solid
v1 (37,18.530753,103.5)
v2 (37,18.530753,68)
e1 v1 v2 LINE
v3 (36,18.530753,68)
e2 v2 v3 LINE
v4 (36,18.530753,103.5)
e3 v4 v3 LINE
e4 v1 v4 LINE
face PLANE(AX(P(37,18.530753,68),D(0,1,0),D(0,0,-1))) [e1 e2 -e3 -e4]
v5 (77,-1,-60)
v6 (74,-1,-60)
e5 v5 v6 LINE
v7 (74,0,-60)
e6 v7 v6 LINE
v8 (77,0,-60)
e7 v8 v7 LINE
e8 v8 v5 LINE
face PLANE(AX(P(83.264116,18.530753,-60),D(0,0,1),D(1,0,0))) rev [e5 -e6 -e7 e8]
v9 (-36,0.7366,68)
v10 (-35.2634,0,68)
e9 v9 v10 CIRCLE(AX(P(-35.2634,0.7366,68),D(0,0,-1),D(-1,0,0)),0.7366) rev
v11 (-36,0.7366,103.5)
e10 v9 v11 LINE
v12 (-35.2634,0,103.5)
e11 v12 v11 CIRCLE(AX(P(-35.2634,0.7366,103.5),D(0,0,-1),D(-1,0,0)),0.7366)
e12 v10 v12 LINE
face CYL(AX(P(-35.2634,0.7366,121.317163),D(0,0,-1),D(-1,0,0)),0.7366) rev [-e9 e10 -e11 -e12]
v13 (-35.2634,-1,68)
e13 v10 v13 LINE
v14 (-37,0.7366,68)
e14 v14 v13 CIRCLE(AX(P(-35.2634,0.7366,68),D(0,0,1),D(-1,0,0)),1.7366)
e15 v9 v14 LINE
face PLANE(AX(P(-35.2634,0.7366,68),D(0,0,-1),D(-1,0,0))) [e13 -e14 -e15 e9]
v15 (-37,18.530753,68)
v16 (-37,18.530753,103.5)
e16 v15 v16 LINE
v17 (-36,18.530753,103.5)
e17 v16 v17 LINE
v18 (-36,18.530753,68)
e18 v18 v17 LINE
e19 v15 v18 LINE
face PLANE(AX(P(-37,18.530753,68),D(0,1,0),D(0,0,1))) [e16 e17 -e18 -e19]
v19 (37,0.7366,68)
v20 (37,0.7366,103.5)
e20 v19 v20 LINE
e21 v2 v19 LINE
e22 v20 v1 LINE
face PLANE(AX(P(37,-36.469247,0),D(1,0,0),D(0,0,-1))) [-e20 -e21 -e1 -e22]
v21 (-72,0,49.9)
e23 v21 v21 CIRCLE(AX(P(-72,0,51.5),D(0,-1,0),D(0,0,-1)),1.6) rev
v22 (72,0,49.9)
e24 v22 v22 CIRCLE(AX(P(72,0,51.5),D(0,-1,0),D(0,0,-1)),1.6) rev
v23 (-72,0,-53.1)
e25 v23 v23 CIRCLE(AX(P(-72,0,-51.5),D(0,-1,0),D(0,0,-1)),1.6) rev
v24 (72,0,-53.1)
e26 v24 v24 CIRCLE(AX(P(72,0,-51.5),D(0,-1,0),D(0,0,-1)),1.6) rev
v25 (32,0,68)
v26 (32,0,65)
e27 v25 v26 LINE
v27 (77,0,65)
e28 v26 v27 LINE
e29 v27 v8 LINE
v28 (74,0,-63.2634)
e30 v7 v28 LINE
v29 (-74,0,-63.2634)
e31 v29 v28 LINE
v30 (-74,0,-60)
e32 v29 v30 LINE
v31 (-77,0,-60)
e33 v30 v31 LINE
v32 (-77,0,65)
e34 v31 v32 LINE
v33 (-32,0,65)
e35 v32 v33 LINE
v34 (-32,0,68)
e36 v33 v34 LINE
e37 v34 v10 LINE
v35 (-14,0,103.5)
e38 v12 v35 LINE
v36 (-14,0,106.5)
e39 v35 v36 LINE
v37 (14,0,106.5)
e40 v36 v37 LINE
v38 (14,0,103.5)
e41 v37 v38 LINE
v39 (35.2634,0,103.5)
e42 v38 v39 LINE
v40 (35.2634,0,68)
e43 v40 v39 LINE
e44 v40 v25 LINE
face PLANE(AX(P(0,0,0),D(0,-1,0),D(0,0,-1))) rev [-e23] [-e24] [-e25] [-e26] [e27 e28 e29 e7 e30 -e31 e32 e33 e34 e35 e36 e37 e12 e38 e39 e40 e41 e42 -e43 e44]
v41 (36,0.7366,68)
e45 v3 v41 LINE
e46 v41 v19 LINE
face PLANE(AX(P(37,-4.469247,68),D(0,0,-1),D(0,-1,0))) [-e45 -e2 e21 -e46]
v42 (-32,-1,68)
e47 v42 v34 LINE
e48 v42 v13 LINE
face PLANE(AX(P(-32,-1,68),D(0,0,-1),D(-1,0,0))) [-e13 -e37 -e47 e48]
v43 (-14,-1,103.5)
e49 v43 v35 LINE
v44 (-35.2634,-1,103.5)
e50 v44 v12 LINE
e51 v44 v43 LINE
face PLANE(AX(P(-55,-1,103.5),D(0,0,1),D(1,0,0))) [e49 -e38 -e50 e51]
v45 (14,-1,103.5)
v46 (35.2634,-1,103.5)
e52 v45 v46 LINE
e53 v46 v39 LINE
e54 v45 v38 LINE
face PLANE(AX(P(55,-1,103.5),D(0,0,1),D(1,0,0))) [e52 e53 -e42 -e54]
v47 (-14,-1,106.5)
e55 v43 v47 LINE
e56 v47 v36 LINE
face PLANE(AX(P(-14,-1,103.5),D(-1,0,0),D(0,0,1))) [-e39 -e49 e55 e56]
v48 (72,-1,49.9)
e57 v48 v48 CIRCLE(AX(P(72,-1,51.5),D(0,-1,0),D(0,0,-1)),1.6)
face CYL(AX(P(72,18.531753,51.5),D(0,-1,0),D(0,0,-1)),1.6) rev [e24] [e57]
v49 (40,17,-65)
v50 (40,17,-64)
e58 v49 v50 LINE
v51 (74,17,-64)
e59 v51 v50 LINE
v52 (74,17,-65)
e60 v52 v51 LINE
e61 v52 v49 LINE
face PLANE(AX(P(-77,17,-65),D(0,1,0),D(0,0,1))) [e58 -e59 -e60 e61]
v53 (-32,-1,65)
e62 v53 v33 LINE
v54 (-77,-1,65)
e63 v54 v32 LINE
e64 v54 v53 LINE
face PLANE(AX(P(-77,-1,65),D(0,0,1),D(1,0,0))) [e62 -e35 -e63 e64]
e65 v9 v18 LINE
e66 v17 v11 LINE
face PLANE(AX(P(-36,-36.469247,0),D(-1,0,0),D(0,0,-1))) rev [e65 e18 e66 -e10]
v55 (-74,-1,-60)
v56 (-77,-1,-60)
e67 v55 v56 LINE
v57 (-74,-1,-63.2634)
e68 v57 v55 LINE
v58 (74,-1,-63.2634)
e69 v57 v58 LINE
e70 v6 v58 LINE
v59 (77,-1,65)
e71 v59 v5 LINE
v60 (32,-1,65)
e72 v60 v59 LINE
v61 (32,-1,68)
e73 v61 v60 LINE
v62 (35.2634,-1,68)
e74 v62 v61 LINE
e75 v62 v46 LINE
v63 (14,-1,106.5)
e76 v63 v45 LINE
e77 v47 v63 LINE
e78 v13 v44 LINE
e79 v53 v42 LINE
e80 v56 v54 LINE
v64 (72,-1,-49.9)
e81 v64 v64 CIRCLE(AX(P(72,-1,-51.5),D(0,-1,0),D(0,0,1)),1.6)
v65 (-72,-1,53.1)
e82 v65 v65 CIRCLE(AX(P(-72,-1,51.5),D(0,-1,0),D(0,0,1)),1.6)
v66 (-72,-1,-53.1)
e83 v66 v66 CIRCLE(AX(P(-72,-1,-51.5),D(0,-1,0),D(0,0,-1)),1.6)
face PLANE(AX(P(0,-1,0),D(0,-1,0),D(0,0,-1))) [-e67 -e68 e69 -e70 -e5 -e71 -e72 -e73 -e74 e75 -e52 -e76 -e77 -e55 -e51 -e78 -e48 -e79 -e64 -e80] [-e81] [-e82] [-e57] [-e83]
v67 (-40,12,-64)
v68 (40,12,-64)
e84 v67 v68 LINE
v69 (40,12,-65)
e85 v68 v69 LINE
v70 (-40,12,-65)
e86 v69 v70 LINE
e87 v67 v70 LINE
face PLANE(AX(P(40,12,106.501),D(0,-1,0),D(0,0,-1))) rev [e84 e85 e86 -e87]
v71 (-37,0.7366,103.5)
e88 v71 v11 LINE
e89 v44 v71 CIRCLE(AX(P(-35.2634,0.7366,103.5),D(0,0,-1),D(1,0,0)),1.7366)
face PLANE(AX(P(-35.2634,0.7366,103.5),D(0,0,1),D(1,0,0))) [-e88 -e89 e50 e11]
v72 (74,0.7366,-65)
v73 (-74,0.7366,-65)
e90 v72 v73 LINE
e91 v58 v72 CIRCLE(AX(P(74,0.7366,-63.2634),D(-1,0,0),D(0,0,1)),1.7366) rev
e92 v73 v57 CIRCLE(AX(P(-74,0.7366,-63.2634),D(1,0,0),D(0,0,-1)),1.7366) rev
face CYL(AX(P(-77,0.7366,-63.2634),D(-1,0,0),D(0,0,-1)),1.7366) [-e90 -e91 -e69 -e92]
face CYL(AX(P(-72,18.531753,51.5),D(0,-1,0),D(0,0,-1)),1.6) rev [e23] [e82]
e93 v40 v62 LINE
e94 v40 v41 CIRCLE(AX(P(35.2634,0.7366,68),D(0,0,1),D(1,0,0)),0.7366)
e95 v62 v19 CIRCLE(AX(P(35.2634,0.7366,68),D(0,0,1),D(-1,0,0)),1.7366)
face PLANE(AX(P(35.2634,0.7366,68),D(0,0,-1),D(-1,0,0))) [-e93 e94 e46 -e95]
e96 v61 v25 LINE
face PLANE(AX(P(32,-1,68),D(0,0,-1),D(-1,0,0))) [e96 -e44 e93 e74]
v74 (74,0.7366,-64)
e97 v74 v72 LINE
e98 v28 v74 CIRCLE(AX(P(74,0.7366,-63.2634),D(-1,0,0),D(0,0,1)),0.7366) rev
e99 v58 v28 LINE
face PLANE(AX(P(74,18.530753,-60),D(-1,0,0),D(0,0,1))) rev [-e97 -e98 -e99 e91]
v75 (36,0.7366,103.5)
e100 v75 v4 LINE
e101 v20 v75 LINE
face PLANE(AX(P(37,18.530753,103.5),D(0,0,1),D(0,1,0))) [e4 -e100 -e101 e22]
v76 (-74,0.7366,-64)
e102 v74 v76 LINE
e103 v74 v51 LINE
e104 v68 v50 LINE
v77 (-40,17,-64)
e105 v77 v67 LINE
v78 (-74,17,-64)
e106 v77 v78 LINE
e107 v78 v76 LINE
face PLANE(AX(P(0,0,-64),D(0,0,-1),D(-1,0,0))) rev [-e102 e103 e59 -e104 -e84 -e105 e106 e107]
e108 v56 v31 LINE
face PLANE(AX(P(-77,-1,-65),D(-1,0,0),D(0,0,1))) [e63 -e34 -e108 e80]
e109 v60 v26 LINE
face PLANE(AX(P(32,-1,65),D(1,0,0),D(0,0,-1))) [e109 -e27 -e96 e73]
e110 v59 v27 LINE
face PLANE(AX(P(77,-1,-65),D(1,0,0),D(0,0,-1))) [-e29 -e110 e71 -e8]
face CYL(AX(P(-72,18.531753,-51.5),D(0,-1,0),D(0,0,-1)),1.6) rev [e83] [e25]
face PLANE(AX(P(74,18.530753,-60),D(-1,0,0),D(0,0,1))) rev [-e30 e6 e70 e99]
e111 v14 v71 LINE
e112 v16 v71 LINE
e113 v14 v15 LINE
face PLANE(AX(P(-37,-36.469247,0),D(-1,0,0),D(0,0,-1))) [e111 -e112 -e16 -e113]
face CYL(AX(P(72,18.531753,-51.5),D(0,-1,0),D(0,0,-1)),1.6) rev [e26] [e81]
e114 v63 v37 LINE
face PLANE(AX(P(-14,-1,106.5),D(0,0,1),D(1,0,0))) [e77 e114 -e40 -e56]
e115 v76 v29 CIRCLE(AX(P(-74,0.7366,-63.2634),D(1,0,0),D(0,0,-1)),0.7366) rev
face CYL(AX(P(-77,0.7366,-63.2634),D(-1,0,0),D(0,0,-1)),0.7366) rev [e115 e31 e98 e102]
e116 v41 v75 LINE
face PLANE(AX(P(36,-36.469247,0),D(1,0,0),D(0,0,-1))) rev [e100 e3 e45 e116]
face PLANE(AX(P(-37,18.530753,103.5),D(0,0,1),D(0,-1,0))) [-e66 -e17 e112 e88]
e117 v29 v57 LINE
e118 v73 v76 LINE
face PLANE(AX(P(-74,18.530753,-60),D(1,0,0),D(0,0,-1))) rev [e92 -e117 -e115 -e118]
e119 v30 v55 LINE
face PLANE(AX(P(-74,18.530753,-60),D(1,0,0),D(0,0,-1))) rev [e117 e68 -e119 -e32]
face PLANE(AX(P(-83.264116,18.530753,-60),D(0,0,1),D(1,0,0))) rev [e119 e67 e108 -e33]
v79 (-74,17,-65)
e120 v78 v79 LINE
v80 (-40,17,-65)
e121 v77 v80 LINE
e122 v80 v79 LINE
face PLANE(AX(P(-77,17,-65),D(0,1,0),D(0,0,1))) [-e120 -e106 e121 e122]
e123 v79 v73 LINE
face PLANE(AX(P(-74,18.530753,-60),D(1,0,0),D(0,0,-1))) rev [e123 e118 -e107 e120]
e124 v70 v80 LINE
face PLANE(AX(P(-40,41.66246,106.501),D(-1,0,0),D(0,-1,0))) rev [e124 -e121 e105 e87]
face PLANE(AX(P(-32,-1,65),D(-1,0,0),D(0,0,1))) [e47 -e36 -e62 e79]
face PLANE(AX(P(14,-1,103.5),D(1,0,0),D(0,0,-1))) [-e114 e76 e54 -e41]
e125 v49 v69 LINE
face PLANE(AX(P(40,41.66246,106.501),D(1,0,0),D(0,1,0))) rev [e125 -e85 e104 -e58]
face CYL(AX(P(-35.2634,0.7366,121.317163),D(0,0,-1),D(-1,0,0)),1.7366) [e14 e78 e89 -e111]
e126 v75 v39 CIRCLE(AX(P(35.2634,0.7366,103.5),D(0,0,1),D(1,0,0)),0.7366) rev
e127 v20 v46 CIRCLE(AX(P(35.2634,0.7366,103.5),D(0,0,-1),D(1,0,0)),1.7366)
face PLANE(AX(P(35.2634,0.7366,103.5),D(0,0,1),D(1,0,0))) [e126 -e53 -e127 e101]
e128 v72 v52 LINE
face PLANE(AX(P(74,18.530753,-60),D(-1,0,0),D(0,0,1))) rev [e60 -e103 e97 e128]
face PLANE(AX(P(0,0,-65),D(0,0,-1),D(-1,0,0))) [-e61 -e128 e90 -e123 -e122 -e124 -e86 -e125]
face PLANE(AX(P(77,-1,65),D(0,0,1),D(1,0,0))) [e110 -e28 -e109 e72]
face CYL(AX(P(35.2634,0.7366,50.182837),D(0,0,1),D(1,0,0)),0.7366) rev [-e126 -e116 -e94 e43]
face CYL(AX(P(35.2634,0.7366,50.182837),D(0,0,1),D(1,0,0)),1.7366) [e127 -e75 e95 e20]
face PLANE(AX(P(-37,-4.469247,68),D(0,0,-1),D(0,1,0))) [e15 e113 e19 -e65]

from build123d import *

# Parameters (mm, degrees)
SM_BASE_FLANGE_1_DEPTH           = 1
OTHER_START                      = 68
OTHER_4_DEPTH                    = 35.5
OTHER_4_2_DEPTH                  = 35.5
CUT_EXTRUDE_1_REACH              = 134.863
SKETCH_10_R                      = 1.6
SM_EDGE_FLANGE_1_STRIP_W         = 5.4732
SM_EDGE_FLANGE_1_STRIP_H         = 1
SM_EDGE_FLANGE_1_STRIP_CUT_DEPTH = 154
SM_EDGE_FLANGE_1_DEPTH           = 154
SKETCH_14_W                      = 9.264116278
SKETCH_14_H                      = 12.510211191
CUT_EXTRUDE_2_DEPTH              = 133.863464967
CUT_EXTRUDE_3_REACH              = 190.904
SKETCH_15_W                      = 80
SKETCH_15_H                      = 29.662460086


# Read off the part's stored shape, not the designer's step: 绘制的折弯4
# Sheet-metal steps are written as plain solids
with BuildPart() as part:
    # Sketch 1 → 基体-法兰1 (new body)
    with BuildSketch(Plane(origin=(0, 0, 0), x_dir=(1, 0, 0), z_dir=(0, 1, 0))):
        Polygon((0.031889959, 65), (-77, 65), (-77, -65), (-32, -65), (-32, -68), (-55, -68), (-55, -103.5), (-14, -103.5), (-14, -106.5), (14, -106.5), (14, -103.5), (55, -103.5), (55, -68), (32, -68), (32, -65), (77, -65), (77, 65), align=None)
    extrude(amount=-SM_BASE_FLANGE_1_DEPTH)

    # Other 4 outline → Other 4 (cut)
    with BuildSketch(Plane.XY.offset(OTHER_START)):
        with BuildLine():
            Line((-55, -1), (-35.2634, -1))
            ThreePointArc((-35.2634, -1), (-36.195226164, -0.728828115), (-36.83604109, 0))
            Line((-36.83604109, 0), (-55, 0))
            Line((-55, 0), (-55, -1))
        make_face()
        with BuildLine():
            ThreePointArc((36.83604109, 0), (36.195226164, -0.728828115), (35.2634, -1))
            Line((35.2634, -1), (55, -1))
            Line((55, -1), (55, 0))
            Line((55, 0), (36.83604109, 0))
        make_face()
    extrude(amount=OTHER_4_DEPTH, mode=Mode.SUBTRACT)

    # Other 4 2 outline → Other 4 2 (add)
    with BuildSketch(Plane.XY.offset(OTHER_START)):
        with BuildLine():
            ThreePointArc((-37, 0.7366), (-36.958514757, 0.359286442), (-36.83604109, 0))
            Line((-36.83604109, 0), (-35.2634, 0))
            ThreePointArc((-35.2634, 0), (-35.784254855, 0.215745145), (-36, 0.7366))
            Line((-36, 0.7366), (-36, 18.530753262))
            Line((-36, 18.530753262), (-37, 18.530753262))
            Line((-37, 18.530753262), (-37, 0.7366))
        make_face()
        with BuildLine():
            Line((35.2634, 0), (36.83604109, 0))
            ThreePointArc((36.83604109, 0), (36.958514757, 0.359286442), (37, 0.7366))
            Line((37, 0.7366), (37, 18.530753262))
            Line((37, 18.530753262), (36, 18.530753262))
            Line((36, 18.530753262), (36, 0.7366))
            ThreePointArc((36, 0.7366), (35.784254855, 0.215745145), (35.2634, 0))
        make_face()
    extrude(amount=OTHER_4_2_DEPTH)

    # 草图10 → 切除-拉伸1 (cut, up to next)
    with BuildSketch(Plane.XZ.offset(1), mode=Mode.PRIVATE) as cut_extrude_1_sk1:
        with Locations(Location((-72, -51.5, 0), (0, 0, 270))):
            Circle(SKETCH_10_R)
    cut_extrude_1_tool1 = extrude(cut_extrude_1_sk1.sketch, amount=-CUT_EXTRUDE_1_REACH, mode=Mode.PRIVATE) & part.part
    # 草图10 → 切除-拉伸1 (cut, up to next)
    with BuildSketch(Plane.XZ.offset(1), mode=Mode.PRIVATE) as cut_extrude_1_sk2:
        with Locations(Location((-72, 51.5, 0), (0, 0, 270))):
            Circle(SKETCH_10_R)
    cut_extrude_1_tool2 = extrude(cut_extrude_1_sk2.sketch, amount=-CUT_EXTRUDE_1_REACH, mode=Mode.PRIVATE) & part.part
    # 草图10 → 切除-拉伸1 (cut, up to next)
    with BuildSketch(Plane.XZ.offset(1), mode=Mode.PRIVATE) as cut_extrude_1_sk3:
        with Locations(Location((72, -51.5, 0), (0, 0, 270))):
            Circle(SKETCH_10_R)
    cut_extrude_1_tool3 = extrude(cut_extrude_1_sk3.sketch, amount=-CUT_EXTRUDE_1_REACH, mode=Mode.PRIVATE) & part.part
    # 草图10 → 切除-拉伸1 (cut, up to next)
    with BuildSketch(Plane.XZ.offset(1), mode=Mode.PRIVATE) as cut_extrude_1_sk4:
        with Locations(Location((72, 51.5, 0), (0, 0, 270))):
            Circle(SKETCH_10_R)
    cut_extrude_1_tool4 = extrude(cut_extrude_1_sk4.sketch, amount=-CUT_EXTRUDE_1_REACH, mode=Mode.PRIVATE) & part.part
    add(cut_extrude_1_tool1.solids().sort_by_distance((-72, -1, -51.5))[0], mode=Mode.SUBTRACT)
    add(cut_extrude_1_tool2.solids().sort_by_distance((-72, -1, 51.5))[0], mode=Mode.SUBTRACT)
    add(cut_extrude_1_tool3.solids().sort_by_distance((72, -1, -51.5))[0], mode=Mode.SUBTRACT)
    add(cut_extrude_1_tool4.solids().sort_by_distance((72, -1, 51.5))[0], mode=Mode.SUBTRACT)

    # 边线-法兰1 strip (across the edge) → 边线-法兰1 strip cut (cut)
    with BuildSketch(Plane(origin=(77, 0, -65), x_dir=(0, 0, 1), z_dir=(-1, 0, 0))):
        with Locations((-1, -0.5)):
            Rectangle(SM_EDGE_FLANGE_1_STRIP_W, SM_EDGE_FLANGE_1_STRIP_H)
    extrude(amount=SM_EDGE_FLANGE_1_STRIP_CUT_DEPTH, mode=Mode.SUBTRACT)

    # 边线-法兰1 section (across the edge) → 边线-法兰1 (add)
    with BuildSketch(Plane(origin=(77, 0, -65), x_dir=(0, 0, 1), z_dir=(-1, 0, 0))):
        with BuildLine():
            Line((0, 0.7366), (0, 17))
            Line((0, 17), (1, 17))
            Line((1, 17), (1, 0.7366))
            ThreePointArc((1, 0.7366), (1.215745145, 0.215745145), (1.7366, 0))
            Line((1.7366, 0), (1.7366, -1))
            ThreePointArc((1.7366, -1), (0.508638364, -0.491361636), (0, 0.7366))
        make_face()
    extrude(amount=SM_EDGE_FLANGE_1_DEPTH)

    # 草图14 → 切除-拉伸2 (cut, through all)
    with BuildSketch(Plane.XZ.offset(1)):
        with Locations((-78.632058139, -66.255105596)):
            Rectangle(SKETCH_14_W, SKETCH_14_H)
        with Locations((78.632058139, -66.255105596)):
            Rectangle(SKETCH_14_W, SKETCH_14_H)
    extrude(amount=-CUT_EXTRUDE_2_DEPTH, mode=Mode.SUBTRACT)

    # 草图15 → 切除-拉伸3 (cut, up to next)
    with BuildSketch(Plane(origin=(0, 0, -65), x_dir=(-1, 0, 0), z_dir=(0, 0, -1)), mode=Mode.PRIVATE) as cut_extrude_3_sk1:
        with Locations((0, 26.831230043)):
            Rectangle(SKETCH_15_W, SKETCH_15_H)
    cut_extrude_3_tool1 = extrude(cut_extrude_3_sk1.sketch, amount=-CUT_EXTRUDE_3_REACH, mode=Mode.PRIVATE) & part.part
    add(cut_extrude_3_tool1.solids().sort_by_distance((0, 26.83123, -65))[0], mode=Mode.SUBTRACT)


solid = part.part
